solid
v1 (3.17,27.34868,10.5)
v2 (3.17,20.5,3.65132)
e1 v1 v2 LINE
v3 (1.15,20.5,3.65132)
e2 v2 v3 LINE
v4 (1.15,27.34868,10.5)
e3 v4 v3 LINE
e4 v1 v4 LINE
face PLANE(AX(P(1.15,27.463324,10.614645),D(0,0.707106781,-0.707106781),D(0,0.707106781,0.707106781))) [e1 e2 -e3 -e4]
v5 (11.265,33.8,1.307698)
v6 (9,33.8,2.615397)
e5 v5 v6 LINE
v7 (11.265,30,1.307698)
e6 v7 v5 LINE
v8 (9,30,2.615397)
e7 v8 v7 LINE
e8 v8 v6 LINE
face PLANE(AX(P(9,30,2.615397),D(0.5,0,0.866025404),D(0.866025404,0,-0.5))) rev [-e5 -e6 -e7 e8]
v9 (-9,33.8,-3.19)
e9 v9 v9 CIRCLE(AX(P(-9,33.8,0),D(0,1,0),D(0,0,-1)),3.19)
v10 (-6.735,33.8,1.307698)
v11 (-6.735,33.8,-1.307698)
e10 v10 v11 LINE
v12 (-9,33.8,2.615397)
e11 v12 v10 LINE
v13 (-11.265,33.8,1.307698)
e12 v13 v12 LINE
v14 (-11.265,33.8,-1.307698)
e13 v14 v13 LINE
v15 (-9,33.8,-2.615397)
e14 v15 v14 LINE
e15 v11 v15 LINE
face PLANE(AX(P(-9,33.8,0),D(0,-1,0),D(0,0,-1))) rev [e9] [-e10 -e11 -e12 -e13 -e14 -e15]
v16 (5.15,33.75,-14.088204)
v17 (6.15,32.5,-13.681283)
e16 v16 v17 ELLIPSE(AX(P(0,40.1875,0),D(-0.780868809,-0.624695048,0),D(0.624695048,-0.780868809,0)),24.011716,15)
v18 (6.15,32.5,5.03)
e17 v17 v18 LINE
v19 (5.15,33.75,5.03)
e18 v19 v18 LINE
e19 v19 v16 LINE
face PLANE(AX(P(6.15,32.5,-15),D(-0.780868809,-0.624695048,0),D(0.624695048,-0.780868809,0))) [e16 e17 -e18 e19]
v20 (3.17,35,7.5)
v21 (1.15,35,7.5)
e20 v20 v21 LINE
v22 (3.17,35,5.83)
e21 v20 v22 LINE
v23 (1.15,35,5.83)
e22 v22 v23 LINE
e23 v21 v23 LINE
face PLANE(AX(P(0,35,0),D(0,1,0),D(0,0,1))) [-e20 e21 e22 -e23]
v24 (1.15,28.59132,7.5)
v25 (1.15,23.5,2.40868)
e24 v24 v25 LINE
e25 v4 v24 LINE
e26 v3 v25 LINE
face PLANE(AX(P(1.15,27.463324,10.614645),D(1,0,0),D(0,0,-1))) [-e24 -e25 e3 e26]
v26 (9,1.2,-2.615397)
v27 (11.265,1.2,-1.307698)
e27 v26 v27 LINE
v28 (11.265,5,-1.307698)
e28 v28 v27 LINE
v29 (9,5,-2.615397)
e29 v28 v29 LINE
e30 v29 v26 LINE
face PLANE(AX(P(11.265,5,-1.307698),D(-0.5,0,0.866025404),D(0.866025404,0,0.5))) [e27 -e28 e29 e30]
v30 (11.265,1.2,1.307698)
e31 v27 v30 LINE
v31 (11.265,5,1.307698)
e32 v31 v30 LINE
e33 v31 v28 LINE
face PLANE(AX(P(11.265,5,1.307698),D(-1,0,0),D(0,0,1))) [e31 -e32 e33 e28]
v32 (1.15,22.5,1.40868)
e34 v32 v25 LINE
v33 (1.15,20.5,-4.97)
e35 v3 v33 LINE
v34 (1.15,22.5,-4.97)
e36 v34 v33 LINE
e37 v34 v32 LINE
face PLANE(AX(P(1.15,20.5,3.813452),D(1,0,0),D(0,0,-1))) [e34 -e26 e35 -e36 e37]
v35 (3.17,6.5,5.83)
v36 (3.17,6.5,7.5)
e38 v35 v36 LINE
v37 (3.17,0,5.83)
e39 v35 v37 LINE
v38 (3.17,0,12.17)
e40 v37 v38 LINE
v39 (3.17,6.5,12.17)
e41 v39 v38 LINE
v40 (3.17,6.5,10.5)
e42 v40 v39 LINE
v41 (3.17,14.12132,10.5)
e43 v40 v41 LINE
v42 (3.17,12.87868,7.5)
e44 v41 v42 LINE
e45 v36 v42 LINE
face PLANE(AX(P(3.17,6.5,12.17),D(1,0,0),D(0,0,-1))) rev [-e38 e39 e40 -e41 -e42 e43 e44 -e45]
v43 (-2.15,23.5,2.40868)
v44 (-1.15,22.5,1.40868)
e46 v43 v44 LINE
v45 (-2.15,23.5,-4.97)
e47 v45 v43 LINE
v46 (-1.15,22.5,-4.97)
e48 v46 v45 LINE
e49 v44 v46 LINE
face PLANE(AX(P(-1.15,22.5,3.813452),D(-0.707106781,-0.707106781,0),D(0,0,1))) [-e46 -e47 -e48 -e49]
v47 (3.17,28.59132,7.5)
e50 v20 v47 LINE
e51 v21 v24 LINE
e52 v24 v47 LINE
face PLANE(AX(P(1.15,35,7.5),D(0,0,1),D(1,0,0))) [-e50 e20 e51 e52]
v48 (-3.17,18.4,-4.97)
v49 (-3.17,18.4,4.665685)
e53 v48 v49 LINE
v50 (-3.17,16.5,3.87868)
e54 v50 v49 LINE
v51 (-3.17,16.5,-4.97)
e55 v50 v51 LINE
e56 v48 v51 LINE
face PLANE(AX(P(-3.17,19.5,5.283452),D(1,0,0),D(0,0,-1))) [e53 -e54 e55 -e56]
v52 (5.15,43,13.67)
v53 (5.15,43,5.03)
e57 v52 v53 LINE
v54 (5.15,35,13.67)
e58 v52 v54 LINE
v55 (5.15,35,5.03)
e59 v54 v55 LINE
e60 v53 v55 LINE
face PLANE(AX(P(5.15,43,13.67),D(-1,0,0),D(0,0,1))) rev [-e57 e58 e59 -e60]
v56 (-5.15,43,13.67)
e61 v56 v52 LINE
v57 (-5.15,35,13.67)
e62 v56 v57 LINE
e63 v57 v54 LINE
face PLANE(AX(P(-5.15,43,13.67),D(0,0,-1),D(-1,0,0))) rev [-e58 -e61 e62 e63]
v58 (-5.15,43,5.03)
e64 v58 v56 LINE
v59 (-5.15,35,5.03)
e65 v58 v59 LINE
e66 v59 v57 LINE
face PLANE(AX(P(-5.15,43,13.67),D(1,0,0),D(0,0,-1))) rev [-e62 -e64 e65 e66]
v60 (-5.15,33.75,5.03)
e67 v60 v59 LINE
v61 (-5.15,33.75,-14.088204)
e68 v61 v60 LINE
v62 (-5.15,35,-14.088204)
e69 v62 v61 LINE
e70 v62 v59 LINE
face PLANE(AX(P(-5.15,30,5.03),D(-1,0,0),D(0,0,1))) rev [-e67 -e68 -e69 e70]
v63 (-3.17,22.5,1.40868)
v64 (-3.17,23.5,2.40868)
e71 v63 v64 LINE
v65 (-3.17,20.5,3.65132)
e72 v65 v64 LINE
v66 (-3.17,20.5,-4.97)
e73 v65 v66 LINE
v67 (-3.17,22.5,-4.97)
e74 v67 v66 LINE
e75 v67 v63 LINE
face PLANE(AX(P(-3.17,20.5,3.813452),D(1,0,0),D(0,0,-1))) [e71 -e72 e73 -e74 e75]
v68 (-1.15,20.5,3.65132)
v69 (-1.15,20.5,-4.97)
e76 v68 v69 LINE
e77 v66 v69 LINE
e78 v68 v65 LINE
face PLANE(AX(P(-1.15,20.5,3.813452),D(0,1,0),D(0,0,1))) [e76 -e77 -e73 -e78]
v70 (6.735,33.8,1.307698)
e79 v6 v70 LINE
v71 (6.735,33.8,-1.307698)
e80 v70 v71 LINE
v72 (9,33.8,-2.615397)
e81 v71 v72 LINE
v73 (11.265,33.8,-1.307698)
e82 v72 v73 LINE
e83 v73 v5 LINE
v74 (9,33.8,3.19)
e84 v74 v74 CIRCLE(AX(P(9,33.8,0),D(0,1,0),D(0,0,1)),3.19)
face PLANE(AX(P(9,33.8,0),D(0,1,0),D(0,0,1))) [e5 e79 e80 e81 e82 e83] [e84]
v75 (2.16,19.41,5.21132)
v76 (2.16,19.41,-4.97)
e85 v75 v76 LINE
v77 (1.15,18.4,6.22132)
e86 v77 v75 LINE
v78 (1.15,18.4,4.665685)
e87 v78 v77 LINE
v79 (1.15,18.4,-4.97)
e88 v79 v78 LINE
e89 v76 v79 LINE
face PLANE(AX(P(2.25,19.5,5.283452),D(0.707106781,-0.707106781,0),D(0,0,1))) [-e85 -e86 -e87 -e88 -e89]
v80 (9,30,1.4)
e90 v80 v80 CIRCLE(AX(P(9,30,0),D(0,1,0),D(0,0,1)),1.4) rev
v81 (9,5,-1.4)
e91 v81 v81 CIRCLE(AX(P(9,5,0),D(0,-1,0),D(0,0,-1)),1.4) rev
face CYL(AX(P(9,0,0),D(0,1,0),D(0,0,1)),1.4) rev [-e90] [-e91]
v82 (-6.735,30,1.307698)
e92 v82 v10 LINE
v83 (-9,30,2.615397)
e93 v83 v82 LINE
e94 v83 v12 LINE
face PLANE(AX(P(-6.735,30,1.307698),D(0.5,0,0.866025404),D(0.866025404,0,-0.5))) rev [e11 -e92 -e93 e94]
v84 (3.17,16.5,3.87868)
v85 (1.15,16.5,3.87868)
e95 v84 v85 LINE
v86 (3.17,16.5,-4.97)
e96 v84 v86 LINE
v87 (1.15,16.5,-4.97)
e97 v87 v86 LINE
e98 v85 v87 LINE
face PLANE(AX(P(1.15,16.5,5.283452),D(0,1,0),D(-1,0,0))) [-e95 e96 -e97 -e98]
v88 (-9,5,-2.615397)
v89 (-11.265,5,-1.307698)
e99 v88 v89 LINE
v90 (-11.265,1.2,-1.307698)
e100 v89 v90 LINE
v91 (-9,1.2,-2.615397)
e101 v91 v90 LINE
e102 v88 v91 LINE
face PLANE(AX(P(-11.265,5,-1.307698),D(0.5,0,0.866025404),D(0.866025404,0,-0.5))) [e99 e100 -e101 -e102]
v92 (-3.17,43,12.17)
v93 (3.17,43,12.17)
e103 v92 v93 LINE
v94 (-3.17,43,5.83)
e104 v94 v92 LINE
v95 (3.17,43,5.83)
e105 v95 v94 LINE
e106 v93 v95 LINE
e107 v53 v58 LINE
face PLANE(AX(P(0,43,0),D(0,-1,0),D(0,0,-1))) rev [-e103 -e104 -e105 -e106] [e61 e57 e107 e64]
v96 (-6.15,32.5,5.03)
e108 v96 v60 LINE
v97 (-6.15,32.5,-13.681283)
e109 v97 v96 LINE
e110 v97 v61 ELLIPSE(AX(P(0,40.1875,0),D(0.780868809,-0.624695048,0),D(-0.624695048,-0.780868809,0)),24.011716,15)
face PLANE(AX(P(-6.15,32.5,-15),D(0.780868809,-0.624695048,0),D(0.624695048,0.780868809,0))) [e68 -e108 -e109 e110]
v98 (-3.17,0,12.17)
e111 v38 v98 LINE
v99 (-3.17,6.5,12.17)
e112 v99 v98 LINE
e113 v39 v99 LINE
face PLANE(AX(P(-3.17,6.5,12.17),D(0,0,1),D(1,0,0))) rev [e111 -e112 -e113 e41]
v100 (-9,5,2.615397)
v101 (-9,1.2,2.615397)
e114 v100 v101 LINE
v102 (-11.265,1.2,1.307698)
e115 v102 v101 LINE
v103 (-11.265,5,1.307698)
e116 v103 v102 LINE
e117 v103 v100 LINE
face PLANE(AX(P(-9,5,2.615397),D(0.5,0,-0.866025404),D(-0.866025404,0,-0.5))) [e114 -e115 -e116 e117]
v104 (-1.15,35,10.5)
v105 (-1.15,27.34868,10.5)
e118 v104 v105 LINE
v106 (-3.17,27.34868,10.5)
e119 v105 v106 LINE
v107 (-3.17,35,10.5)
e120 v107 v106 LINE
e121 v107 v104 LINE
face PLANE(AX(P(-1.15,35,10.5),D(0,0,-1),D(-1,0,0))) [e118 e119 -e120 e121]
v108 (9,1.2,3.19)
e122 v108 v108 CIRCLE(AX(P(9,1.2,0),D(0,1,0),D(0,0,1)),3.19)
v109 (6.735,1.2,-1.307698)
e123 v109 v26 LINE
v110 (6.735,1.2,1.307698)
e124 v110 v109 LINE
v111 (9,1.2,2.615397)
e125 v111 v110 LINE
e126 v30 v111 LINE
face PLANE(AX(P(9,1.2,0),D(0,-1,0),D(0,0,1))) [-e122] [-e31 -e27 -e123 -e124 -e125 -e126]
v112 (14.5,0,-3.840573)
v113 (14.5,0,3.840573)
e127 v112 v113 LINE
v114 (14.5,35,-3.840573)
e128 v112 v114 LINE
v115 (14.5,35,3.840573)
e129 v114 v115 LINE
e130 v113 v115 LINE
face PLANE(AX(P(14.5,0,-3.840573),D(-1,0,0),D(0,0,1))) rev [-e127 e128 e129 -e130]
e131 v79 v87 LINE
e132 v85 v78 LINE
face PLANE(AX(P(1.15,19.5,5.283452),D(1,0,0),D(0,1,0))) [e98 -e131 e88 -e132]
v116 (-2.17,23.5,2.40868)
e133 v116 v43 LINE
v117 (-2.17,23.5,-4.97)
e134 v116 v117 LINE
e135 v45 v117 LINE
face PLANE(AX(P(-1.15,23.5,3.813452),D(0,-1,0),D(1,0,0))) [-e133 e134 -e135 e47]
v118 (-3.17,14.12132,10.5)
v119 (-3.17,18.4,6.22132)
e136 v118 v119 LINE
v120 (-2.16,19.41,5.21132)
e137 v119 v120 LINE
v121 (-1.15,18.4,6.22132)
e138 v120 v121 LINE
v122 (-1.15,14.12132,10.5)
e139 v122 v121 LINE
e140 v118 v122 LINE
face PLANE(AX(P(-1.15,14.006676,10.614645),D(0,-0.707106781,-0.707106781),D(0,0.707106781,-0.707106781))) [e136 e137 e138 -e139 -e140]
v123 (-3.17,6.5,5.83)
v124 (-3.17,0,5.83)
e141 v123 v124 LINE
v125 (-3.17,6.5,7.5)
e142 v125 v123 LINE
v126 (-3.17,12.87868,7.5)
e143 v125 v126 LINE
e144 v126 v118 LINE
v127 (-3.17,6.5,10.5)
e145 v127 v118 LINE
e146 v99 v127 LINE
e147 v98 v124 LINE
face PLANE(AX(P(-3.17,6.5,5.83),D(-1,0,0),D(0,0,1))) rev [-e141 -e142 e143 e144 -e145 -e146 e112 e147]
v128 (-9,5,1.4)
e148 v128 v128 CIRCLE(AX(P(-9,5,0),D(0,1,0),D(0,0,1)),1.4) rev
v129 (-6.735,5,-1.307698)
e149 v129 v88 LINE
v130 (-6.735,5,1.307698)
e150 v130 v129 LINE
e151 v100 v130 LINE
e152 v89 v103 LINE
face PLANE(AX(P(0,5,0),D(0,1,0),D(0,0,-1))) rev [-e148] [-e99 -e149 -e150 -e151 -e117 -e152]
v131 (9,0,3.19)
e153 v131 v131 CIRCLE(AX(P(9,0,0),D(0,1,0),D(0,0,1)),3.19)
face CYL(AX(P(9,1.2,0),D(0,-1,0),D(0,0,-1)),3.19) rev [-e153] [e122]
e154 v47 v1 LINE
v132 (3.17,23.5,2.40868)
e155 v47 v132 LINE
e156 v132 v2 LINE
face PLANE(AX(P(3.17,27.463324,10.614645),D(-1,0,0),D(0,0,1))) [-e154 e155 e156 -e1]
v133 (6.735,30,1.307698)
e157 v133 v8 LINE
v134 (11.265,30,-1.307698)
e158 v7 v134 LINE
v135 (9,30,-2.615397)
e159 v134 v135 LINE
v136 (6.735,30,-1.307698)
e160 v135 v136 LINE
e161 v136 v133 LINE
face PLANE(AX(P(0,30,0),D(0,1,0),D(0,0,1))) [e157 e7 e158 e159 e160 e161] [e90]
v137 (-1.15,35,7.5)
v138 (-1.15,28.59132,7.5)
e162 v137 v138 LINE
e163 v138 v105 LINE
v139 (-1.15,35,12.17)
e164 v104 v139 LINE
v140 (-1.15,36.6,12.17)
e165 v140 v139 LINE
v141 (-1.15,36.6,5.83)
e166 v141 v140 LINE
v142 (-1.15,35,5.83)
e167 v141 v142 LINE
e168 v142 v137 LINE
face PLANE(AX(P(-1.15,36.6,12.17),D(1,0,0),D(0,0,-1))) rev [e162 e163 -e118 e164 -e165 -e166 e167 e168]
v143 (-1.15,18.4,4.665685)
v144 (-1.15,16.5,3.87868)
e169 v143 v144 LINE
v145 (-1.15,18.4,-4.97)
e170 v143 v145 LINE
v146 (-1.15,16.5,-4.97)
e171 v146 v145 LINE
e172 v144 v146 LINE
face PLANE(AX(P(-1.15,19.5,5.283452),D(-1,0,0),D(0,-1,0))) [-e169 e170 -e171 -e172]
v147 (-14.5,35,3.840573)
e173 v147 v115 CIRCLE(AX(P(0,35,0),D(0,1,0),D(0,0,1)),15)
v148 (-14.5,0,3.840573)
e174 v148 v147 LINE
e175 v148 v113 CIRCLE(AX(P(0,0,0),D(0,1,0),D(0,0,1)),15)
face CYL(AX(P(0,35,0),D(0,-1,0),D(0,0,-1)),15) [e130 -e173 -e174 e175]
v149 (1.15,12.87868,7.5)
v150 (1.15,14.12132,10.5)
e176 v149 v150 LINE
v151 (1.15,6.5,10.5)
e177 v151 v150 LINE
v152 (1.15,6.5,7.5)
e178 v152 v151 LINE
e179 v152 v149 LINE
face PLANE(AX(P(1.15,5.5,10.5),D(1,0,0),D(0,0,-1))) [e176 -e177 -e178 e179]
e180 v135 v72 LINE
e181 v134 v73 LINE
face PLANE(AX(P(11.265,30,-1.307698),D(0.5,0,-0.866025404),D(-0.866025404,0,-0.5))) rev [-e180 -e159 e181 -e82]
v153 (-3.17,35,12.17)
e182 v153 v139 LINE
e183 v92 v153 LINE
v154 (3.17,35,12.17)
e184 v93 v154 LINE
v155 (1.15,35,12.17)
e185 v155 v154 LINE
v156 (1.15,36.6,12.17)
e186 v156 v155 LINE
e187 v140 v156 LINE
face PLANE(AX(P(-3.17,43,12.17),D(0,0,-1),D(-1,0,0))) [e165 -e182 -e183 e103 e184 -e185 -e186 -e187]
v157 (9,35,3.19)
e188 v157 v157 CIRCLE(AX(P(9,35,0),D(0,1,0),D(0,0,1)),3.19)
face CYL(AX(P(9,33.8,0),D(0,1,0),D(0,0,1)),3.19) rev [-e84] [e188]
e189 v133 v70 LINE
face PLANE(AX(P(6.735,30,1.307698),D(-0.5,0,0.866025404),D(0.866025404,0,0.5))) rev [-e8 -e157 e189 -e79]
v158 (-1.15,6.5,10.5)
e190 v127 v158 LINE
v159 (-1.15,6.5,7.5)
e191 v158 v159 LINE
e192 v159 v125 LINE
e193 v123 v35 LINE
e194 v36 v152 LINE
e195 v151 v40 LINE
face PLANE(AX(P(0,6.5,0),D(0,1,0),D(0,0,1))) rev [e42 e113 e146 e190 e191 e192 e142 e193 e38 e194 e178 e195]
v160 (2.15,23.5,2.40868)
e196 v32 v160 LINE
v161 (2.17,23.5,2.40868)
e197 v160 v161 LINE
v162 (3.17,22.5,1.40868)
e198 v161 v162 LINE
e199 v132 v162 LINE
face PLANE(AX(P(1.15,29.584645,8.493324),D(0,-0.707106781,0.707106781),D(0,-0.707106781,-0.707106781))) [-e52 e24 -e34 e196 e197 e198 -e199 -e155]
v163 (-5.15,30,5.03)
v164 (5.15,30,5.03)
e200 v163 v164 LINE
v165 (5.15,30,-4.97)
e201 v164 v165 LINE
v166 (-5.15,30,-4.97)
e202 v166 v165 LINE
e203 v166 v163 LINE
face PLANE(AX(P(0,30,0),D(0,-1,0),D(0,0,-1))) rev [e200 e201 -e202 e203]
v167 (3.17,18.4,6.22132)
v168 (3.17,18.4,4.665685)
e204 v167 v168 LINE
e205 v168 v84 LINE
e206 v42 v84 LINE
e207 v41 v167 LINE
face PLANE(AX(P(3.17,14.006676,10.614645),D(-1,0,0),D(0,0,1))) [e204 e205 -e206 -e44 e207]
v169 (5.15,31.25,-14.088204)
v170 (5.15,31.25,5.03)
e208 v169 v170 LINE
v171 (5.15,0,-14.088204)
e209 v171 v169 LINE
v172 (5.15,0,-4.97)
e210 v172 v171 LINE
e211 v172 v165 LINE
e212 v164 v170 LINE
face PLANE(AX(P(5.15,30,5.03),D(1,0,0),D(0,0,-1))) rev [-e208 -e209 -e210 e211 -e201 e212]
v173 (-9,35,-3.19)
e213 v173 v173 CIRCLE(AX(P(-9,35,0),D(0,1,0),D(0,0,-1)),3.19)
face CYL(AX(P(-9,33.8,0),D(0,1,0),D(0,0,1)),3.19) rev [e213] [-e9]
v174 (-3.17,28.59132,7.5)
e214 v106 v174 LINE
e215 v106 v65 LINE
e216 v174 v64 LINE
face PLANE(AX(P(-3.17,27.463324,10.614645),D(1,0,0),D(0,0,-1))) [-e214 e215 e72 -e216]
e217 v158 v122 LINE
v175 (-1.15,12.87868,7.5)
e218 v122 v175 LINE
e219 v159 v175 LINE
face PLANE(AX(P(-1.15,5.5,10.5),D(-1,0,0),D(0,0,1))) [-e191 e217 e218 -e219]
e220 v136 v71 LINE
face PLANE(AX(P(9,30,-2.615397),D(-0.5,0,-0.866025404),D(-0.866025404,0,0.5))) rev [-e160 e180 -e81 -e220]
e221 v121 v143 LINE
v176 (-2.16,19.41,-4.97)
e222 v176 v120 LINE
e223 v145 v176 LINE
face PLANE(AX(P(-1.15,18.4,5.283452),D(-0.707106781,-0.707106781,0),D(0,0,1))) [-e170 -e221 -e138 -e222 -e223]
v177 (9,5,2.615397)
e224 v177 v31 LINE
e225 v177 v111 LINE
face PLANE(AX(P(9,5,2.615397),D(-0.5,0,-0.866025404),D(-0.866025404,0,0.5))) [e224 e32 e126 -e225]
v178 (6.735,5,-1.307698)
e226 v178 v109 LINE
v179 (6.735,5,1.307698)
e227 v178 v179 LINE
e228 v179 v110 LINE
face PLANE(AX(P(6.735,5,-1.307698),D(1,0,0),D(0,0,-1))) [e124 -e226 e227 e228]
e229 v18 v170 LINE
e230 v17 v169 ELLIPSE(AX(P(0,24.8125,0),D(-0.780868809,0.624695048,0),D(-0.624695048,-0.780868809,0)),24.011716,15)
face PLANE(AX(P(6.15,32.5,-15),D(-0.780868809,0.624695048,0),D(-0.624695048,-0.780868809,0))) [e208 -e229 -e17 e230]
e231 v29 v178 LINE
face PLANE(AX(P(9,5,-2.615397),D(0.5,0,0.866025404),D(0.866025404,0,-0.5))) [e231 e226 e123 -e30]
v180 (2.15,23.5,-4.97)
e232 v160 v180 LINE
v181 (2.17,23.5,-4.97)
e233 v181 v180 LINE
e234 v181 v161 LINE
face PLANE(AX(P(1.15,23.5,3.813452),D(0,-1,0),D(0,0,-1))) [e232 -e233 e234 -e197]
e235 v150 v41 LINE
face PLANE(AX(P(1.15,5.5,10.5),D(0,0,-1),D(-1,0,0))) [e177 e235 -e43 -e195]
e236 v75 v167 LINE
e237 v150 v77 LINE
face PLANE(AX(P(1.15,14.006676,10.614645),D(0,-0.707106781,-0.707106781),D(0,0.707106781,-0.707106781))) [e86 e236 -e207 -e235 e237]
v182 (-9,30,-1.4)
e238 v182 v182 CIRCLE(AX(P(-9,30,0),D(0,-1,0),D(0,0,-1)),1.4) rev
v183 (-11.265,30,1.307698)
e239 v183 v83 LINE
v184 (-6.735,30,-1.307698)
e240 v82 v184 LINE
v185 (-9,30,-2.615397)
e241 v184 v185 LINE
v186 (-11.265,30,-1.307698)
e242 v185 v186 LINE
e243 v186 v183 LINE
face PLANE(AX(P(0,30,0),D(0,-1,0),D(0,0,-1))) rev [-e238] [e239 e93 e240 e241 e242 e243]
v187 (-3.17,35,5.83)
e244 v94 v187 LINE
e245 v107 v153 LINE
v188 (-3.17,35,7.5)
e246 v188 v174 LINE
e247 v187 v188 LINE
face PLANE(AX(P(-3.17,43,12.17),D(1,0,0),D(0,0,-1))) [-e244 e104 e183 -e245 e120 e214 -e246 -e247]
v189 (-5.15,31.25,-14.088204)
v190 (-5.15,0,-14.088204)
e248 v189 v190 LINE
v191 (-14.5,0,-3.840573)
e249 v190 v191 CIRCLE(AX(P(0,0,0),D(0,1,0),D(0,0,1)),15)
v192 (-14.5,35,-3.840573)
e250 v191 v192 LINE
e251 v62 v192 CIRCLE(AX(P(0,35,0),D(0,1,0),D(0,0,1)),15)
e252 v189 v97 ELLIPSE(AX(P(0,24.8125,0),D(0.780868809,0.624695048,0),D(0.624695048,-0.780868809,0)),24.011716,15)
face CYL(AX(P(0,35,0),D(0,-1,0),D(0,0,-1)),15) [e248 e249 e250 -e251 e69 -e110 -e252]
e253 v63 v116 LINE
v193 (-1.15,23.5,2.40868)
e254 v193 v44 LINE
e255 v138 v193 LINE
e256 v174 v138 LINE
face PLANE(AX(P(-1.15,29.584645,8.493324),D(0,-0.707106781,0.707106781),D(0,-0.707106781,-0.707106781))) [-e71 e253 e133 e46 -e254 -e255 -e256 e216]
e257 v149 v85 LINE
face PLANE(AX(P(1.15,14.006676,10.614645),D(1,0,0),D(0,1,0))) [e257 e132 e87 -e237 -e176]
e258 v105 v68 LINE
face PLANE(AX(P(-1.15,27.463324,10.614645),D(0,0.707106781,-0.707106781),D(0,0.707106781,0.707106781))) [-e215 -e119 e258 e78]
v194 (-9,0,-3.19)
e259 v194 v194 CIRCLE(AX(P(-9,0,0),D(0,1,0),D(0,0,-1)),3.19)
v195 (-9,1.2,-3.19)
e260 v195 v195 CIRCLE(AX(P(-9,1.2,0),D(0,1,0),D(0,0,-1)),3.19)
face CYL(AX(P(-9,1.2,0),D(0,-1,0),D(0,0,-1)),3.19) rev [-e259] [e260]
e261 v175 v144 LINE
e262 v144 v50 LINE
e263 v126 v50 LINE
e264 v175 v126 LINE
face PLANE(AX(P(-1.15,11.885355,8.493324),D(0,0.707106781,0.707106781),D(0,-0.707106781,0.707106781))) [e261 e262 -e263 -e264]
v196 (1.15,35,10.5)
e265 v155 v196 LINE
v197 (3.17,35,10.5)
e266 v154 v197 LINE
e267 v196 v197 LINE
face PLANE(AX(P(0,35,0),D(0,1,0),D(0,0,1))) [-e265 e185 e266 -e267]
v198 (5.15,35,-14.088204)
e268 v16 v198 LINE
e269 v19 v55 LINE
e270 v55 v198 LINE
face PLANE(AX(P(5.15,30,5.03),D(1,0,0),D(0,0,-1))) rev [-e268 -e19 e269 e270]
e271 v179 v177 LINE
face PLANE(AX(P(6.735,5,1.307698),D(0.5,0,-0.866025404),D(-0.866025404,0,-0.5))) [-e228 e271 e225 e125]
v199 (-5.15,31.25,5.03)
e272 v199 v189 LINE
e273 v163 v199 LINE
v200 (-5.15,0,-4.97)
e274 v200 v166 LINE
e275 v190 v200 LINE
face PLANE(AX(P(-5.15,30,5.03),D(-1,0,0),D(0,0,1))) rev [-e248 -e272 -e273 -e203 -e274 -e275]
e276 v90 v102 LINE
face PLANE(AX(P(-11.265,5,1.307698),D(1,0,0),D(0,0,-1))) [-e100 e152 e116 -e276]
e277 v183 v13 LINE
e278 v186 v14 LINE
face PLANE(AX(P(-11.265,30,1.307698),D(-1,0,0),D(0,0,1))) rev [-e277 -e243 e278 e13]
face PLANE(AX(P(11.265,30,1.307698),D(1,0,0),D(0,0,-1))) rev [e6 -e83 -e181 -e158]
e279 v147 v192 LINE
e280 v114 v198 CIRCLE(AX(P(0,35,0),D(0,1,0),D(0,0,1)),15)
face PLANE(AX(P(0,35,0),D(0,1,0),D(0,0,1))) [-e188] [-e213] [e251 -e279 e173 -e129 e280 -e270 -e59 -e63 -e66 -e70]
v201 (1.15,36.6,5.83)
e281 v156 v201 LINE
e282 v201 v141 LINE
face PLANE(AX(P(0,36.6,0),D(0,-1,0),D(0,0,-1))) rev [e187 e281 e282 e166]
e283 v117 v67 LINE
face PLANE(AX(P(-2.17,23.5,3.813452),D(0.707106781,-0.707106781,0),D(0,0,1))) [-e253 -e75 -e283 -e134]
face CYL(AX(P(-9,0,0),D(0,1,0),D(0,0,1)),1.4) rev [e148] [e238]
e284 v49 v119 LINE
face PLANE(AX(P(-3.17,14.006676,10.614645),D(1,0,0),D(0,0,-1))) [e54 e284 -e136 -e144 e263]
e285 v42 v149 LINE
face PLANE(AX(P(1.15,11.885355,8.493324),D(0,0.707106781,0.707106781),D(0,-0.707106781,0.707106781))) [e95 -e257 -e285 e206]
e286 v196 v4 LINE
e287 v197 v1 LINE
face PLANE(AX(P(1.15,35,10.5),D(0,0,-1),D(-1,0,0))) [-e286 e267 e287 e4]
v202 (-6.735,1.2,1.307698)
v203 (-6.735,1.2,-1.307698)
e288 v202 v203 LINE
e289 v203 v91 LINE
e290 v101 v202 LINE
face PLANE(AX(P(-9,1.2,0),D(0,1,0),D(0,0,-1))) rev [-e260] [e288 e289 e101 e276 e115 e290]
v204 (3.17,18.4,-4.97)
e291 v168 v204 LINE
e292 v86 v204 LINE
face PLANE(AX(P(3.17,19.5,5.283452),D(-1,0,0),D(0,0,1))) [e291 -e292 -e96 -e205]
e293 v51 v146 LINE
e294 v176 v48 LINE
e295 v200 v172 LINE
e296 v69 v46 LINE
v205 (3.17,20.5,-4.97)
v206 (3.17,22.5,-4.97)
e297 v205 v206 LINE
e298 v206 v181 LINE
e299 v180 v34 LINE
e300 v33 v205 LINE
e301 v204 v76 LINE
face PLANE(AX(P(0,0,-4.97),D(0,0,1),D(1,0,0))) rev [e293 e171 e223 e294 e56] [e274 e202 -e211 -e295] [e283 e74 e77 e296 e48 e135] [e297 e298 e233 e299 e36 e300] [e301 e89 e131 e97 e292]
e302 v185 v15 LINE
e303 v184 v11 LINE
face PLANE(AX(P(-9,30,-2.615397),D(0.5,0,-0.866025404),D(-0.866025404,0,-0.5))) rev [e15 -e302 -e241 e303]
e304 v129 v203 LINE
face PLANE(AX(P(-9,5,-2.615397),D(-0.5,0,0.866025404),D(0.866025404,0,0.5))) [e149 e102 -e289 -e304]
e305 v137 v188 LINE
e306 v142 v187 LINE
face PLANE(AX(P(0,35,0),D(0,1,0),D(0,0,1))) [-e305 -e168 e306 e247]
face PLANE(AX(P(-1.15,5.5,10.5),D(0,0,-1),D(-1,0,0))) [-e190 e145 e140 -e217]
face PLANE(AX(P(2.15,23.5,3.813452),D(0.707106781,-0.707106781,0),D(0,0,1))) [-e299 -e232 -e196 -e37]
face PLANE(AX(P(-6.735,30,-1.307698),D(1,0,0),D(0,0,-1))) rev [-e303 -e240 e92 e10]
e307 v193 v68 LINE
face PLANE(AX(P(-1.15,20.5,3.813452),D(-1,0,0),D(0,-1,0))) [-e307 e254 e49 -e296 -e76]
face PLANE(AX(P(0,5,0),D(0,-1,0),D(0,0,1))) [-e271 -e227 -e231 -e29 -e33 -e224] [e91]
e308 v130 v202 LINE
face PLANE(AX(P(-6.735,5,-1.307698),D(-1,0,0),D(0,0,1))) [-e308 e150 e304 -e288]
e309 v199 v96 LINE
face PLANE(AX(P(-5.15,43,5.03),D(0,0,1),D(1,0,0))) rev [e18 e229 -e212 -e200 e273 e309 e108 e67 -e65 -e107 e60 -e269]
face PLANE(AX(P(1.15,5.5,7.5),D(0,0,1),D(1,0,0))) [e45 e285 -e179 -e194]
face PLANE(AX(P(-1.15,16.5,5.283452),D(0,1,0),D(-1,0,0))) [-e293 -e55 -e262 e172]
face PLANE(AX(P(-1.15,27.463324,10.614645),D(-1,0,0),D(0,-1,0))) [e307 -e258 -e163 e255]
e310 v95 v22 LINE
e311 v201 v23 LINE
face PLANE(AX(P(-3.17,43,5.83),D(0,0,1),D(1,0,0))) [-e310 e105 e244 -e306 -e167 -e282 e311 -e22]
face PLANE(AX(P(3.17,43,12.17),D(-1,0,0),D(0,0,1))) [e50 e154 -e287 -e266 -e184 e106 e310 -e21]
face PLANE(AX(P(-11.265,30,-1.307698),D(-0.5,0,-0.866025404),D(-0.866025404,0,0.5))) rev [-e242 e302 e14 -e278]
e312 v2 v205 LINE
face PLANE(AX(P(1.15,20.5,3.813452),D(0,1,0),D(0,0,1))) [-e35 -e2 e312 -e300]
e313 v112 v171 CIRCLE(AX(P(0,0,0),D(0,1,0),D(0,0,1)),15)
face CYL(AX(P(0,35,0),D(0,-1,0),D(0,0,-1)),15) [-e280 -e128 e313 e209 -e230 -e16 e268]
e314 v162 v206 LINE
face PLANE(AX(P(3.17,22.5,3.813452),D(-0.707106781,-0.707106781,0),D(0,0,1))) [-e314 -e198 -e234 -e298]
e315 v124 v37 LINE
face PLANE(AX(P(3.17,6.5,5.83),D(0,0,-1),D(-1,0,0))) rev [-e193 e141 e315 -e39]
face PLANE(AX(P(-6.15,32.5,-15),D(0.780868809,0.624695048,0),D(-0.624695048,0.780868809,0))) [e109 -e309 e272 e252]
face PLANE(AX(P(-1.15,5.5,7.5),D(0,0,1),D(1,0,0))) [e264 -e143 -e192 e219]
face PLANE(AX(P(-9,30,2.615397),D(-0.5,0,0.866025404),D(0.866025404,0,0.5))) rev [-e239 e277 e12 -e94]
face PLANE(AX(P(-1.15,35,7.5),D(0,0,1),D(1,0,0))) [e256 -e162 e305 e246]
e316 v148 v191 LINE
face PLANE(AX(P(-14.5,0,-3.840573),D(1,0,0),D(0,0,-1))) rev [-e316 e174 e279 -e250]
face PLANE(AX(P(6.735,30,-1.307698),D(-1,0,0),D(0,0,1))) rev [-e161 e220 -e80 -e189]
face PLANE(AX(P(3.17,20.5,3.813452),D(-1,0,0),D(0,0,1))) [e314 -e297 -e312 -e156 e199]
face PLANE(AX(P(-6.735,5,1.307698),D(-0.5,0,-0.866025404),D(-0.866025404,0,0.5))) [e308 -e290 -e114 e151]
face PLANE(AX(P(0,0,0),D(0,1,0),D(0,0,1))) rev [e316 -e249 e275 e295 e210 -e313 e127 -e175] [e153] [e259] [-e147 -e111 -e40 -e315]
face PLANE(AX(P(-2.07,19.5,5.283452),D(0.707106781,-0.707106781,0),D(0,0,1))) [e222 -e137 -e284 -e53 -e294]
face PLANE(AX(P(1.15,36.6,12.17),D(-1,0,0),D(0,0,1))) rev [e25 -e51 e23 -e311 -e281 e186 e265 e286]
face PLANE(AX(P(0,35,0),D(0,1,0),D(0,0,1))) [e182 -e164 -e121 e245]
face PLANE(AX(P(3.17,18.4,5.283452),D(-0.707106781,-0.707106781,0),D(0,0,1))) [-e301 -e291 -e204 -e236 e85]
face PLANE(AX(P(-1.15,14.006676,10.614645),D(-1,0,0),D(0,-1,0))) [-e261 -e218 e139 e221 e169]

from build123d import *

# Parameters (mm, degrees)
SKETCH_1_R          = 15
EXTRUDE_1_DEPTH     = 35
SKETCH_2_R          = 1.4
CUT_EXTRUDE_1_DEPTH = 41.926763859
SKETCH_4_W          = 10.3
SKETCH_4_H          = 8.64
SKETCH_4_W_2        = 6.34
SKETCH_4_H_2        = 6.34
EXTRUDE_2_DEPTH     = 8
SKETCH_5_W          = 10.3
SKETCH_5_H          = 20.03
CUT_EXTRUDE_2_DEPTH = 5
CUT_EXTRUDE_3_DEPTH = 50.751390935
CUT_EXTRUDE_4_DEPTH = 37.742346142
SKETCH_8_W          = 2.3
SKETCH_8_H          = 6.34
EXTRUDE_3_DEPTH     = 1.6
SKETCH_10_W         = 2.02
SKETCH_10_H         = 3
SKETCH_11_W         = 6.34
SKETCH_11_H         = 6.34
CUT_EXTRUDE_5_DEPTH = 6.5
SKETCH_12_W         = 2.02
SKETCH_12_H         = 3
CUT_EXTRUDE_7_DEPTH = 5
SKETCH_16_R         = 3.19
CUT_EXTRUDE_8_DEPTH = 1.2
CUT_EXTRUDE_9_DEPTH = 41.926763859
CHAMFER_1_SIZE      = 1.1
CHAMFER_2_SIZE      = 1


with BuildPart() as part:
    # 草图1 → 凸台-拉伸1 (new body)
    with BuildSketch(Plane(origin=(0, 0, 0), x_dir=(1, 0, 0), z_dir=(0, 1, 0))):
        with Locations(Location((0, 0, 0), (0, 0, 270))):
            Circle(SKETCH_1_R)
    extrude(amount=EXTRUDE_1_DEPTH)

    # 草图2 → 切除-拉伸1 (cut, through all)
    with BuildSketch(Plane(origin=(0, 35, 0), x_dir=(1, 0, 0), z_dir=(0, 1, 0))):
        with Locations(Location((9, 0, 0), (0, 0, 270))):
            Circle(SKETCH_2_R)
        with Locations(Location((-9, 0, 0), (0, 0, 90))):
            Circle(SKETCH_2_R)
    extrude(amount=-CUT_EXTRUDE_1_DEPTH, mode=Mode.SUBTRACT)

    # 草图4 → 凸台-拉伸2 (add)
    with BuildSketch(Plane(origin=(0, 35, 0), x_dir=(1, 0, 0), z_dir=(0, 1, 0))):
        with Locations((0, -9.35)):
            Rectangle(SKETCH_4_W, SKETCH_4_H)
        with Locations((0, -9)):
            Rectangle(SKETCH_4_W_2, SKETCH_4_H_2, mode=Mode.SUBTRACT)
    extrude(amount=EXTRUDE_2_DEPTH)

    # 草图5 → 切除-拉伸2 (cut)
    with BuildSketch(Plane(origin=(0, 35, 0), x_dir=(1, 0, 0), z_dir=(0, 1, 0))):
        with Locations((0, 4.985)):
            Rectangle(SKETCH_5_W, SKETCH_5_H)
    extrude(amount=-CUT_EXTRUDE_2_DEPTH, mode=Mode.SUBTRACT)

    # 草图6 → 切除-拉伸3 (cut, through all)
    with BuildSketch(Plane(origin=(0, 0, 5.03), x_dir=(-1, 0, 0), z_dir=(0, 0, -1))):
        Polygon((-6.15, 32.5), (-5.15, 33.75), (-5.15, 31.25), align=None)
        Polygon((6.15, 32.5), (5.15, 33.75), (5.15, 31.25), align=None)
    extrude(amount=CUT_EXTRUDE_3_DEPTH, mode=Mode.SUBTRACT)

    # 草图7 → 切除-拉伸4 (cut, through all)
    with BuildSketch(Plane(origin=(0, 30, 0), x_dir=(1, 0, 0), z_dir=(0, 1, 0))):
        with BuildLine():
            Line((-5.15, 14.088204286), (-5.15, 4.97))
            Line((-5.15, 4.97), (5.15, 4.97))
            Line((5.15, 4.97), (5.15, 14.088204286))
            ThreePointArc((5.15, 14.088204286), (0, 15), (-5.15, 14.088204286))
        make_face()
    extrude(amount=-CUT_EXTRUDE_4_DEPTH, mode=Mode.SUBTRACT)

    # 草图8 → 凸台-拉伸3 (add)
    with BuildSketch(Plane(origin=(0, 35, 0), x_dir=(1, 0, 0), z_dir=(0, 1, 0))):
        with Locations((0, -9)):
            Rectangle(SKETCH_8_W, SKETCH_8_H)
    extrude(amount=EXTRUDE_3_DEPTH)

    # 切除-扫描1: sweep along a path in 草图9
    with BuildLine(Plane(origin=(0, 0, 0), x_dir=(0, 0, -1), z_dir=(1, 0, 0))) as sweep_1_path:
        Line((-9, 35), (-9, 27.97))
        Line((-9, 27.97), (-3.03, 22))
        Line((-3.03, 22), (4.97, 22))
    # 草图10 → 切除-扫描1 (sweep, cut)
    with BuildSketch(Plane(origin=(0, 35, 0), x_dir=(1, 0, 0), z_dir=(0, 1, 0))):
        with Locations((2.16, -9)):
            Rectangle(SKETCH_10_W, SKETCH_10_H)
        with Locations((-2.16, -9)):
            Rectangle(SKETCH_10_W, SKETCH_10_H)
    sweep(path=sweep_1_path.line, transition=Transition.RIGHT, mode=Mode.SUBTRACT)

    # 草图11 → 切除-拉伸5 (cut)
    with BuildSketch(Plane.XZ):
        with Locations((0, 9)):
            Rectangle(SKETCH_11_W, SKETCH_11_H)
    extrude(amount=-CUT_EXTRUDE_5_DEPTH, mode=Mode.SUBTRACT)

    # 切除-扫描2: sweep along a path in 草图13
    with BuildLine(Plane(origin=(0, 0, 0), x_dir=(0, 0, -1), z_dir=(1, 0, 0))) as sweep_2_path:
        Line((-9, 6.5), (-9, 13.5))
        Line((-9, 13.5), (-4.5, 18))
        Line((-4.5, 18), (4.97, 18))
    # 草图12 → 切除-扫描2 (sweep, cut)
    with BuildSketch(Plane.XZ.offset(-6.5)):
        with Locations((-2.16, 9)):
            Rectangle(SKETCH_12_W, SKETCH_12_H)
        with Locations((2.16, 9)):
            Rectangle(SKETCH_12_W, SKETCH_12_H)
    sweep(path=sweep_2_path.line, transition=Transition.RIGHT, mode=Mode.SUBTRACT)

    # 草图15 → 切除-拉伸7 (cut)
    with BuildSketch(Plane(origin=(0, 35, 0), x_dir=(1, 0, 0), z_dir=(0, 1, 0))):
        Polygon((9, 2.615396719), (6.735, 1.30769836), (6.735, -1.30769836), (9, -2.615396719), (11.265, -1.30769836), (11.265, 1.30769836), align=None)
        Polygon((-11.265, -1.30769836), (-11.265, 1.30769836), (-9, 2.615396719), (-6.735, 1.30769836), (-6.735, -1.30769836), (-9, -2.615396719), align=None)
    cut_extrude_7 = extrude(amount=-CUT_EXTRUDE_7_DEPTH, mode=Mode.SUBTRACT)

    # 草图16 → 切除-拉伸8 (cut)
    with BuildSketch(Plane(origin=(0, 35, 0), x_dir=(1, 0, 0), z_dir=(0, 1, 0))):
        with Locations(Location((9, 0, 0), (0, 0, 270))):
            Circle(SKETCH_16_R)
        with Locations(Location((-9, 0, 0), (0, 0, 90))):
            Circle(SKETCH_16_R)
    cut_extrude_8 = extrude(amount=-CUT_EXTRUDE_8_DEPTH, mode=Mode.SUBTRACT)

    # 镜向1: 切除-拉伸7, 切除-拉伸8 across plane
    add(cut_extrude_7.mirror(Plane.ZX.offset(17.5)), mode=Mode.SUBTRACT)
    add(cut_extrude_8.mirror(Plane.ZX.offset(17.5)), mode=Mode.SUBTRACT)

    # 草图17 → 切除-拉伸9 (cut, through all)
    with BuildSketch(Plane(origin=(0, 35, 0), x_dir=(1, 0, 0), z_dir=(0, 1, 0))):
        with BuildLine():
            Line((14.5, 3.840572874), (14.5, -3.840572874))
            ThreePointArc((14.5, -3.840572874), (15, 0), (14.5, 3.840572874))
        make_face()
        with BuildLine():
            Line((-14.5, 3.840572874), (-14.5, -3.840572874))
            ThreePointArc((-14.5, -3.840572874), (-15, 0), (-14.5, 3.840572874))
        make_face()
    extrude(amount=-CUT_EXTRUDE_9_DEPTH, mode=Mode.SUBTRACT)

    # 倒角1
    # the kernel refuses this chamfer: 1.1 mm, written as the material it adds along each edge
    with BuildSketch(Plane(origin=(-3.17, 19.5, 7.95017163), x_dir=(-0.027495876610586133, -0.9996219169112966, 0), z_dir=(0, 0, -1))) as chamfer_1_piece_1:
        Polygon((CHAMFER_1_SIZE * 0.999621916911, -CHAMFER_1_SIZE * 0.0274958766106), (-CHAMFER_1_SIZE * 0.0274958766106, -CHAMFER_1_SIZE * 0.999621916911), (0, 0), align=None)
    extrude(amount=12.92017163)
    with BuildSketch(Plane(origin=(-1.15, 19.5, 7.95017163), x_dir=(0.02749587661058633, -0.9996219169112966, 0), z_dir=(0, 0, -1)), Plane(origin=(3.17, 19.5, 7.95017163), x_dir=(0.027495876610586525, -0.9996219169112966, 0), z_dir=(0, 0, -1)), Plane(origin=(1.15, 19.5, 7.95017163), x_dir=(0.9996219169112966, 0.02749587661058971, 0), z_dir=(0, 0, -1))) as chamfer_1_piece_2:
        Polygon((CHAMFER_1_SIZE * 0.999621916911, CHAMFER_1_SIZE * 0.0274958766106), (-CHAMFER_1_SIZE * 0.0274958766106, CHAMFER_1_SIZE * 0.999621916911), (0, 0), align=None)
    extrude(amount=12.92017163)

    # 倒角2
    chamfer_2_edges = [part.edges().sort_by_distance(p)[0] for p in [
        (3.17, 23.5, -1.280660172),
        (1.15, 23.5, -1.280660172),
        (-1.15, 23.5, -1.280660172),
        (-3.17, 23.5, -1.280660172),
    ]]
    chamfer(chamfer_2_edges, length=CHAMFER_2_SIZE)


solid = part.part
